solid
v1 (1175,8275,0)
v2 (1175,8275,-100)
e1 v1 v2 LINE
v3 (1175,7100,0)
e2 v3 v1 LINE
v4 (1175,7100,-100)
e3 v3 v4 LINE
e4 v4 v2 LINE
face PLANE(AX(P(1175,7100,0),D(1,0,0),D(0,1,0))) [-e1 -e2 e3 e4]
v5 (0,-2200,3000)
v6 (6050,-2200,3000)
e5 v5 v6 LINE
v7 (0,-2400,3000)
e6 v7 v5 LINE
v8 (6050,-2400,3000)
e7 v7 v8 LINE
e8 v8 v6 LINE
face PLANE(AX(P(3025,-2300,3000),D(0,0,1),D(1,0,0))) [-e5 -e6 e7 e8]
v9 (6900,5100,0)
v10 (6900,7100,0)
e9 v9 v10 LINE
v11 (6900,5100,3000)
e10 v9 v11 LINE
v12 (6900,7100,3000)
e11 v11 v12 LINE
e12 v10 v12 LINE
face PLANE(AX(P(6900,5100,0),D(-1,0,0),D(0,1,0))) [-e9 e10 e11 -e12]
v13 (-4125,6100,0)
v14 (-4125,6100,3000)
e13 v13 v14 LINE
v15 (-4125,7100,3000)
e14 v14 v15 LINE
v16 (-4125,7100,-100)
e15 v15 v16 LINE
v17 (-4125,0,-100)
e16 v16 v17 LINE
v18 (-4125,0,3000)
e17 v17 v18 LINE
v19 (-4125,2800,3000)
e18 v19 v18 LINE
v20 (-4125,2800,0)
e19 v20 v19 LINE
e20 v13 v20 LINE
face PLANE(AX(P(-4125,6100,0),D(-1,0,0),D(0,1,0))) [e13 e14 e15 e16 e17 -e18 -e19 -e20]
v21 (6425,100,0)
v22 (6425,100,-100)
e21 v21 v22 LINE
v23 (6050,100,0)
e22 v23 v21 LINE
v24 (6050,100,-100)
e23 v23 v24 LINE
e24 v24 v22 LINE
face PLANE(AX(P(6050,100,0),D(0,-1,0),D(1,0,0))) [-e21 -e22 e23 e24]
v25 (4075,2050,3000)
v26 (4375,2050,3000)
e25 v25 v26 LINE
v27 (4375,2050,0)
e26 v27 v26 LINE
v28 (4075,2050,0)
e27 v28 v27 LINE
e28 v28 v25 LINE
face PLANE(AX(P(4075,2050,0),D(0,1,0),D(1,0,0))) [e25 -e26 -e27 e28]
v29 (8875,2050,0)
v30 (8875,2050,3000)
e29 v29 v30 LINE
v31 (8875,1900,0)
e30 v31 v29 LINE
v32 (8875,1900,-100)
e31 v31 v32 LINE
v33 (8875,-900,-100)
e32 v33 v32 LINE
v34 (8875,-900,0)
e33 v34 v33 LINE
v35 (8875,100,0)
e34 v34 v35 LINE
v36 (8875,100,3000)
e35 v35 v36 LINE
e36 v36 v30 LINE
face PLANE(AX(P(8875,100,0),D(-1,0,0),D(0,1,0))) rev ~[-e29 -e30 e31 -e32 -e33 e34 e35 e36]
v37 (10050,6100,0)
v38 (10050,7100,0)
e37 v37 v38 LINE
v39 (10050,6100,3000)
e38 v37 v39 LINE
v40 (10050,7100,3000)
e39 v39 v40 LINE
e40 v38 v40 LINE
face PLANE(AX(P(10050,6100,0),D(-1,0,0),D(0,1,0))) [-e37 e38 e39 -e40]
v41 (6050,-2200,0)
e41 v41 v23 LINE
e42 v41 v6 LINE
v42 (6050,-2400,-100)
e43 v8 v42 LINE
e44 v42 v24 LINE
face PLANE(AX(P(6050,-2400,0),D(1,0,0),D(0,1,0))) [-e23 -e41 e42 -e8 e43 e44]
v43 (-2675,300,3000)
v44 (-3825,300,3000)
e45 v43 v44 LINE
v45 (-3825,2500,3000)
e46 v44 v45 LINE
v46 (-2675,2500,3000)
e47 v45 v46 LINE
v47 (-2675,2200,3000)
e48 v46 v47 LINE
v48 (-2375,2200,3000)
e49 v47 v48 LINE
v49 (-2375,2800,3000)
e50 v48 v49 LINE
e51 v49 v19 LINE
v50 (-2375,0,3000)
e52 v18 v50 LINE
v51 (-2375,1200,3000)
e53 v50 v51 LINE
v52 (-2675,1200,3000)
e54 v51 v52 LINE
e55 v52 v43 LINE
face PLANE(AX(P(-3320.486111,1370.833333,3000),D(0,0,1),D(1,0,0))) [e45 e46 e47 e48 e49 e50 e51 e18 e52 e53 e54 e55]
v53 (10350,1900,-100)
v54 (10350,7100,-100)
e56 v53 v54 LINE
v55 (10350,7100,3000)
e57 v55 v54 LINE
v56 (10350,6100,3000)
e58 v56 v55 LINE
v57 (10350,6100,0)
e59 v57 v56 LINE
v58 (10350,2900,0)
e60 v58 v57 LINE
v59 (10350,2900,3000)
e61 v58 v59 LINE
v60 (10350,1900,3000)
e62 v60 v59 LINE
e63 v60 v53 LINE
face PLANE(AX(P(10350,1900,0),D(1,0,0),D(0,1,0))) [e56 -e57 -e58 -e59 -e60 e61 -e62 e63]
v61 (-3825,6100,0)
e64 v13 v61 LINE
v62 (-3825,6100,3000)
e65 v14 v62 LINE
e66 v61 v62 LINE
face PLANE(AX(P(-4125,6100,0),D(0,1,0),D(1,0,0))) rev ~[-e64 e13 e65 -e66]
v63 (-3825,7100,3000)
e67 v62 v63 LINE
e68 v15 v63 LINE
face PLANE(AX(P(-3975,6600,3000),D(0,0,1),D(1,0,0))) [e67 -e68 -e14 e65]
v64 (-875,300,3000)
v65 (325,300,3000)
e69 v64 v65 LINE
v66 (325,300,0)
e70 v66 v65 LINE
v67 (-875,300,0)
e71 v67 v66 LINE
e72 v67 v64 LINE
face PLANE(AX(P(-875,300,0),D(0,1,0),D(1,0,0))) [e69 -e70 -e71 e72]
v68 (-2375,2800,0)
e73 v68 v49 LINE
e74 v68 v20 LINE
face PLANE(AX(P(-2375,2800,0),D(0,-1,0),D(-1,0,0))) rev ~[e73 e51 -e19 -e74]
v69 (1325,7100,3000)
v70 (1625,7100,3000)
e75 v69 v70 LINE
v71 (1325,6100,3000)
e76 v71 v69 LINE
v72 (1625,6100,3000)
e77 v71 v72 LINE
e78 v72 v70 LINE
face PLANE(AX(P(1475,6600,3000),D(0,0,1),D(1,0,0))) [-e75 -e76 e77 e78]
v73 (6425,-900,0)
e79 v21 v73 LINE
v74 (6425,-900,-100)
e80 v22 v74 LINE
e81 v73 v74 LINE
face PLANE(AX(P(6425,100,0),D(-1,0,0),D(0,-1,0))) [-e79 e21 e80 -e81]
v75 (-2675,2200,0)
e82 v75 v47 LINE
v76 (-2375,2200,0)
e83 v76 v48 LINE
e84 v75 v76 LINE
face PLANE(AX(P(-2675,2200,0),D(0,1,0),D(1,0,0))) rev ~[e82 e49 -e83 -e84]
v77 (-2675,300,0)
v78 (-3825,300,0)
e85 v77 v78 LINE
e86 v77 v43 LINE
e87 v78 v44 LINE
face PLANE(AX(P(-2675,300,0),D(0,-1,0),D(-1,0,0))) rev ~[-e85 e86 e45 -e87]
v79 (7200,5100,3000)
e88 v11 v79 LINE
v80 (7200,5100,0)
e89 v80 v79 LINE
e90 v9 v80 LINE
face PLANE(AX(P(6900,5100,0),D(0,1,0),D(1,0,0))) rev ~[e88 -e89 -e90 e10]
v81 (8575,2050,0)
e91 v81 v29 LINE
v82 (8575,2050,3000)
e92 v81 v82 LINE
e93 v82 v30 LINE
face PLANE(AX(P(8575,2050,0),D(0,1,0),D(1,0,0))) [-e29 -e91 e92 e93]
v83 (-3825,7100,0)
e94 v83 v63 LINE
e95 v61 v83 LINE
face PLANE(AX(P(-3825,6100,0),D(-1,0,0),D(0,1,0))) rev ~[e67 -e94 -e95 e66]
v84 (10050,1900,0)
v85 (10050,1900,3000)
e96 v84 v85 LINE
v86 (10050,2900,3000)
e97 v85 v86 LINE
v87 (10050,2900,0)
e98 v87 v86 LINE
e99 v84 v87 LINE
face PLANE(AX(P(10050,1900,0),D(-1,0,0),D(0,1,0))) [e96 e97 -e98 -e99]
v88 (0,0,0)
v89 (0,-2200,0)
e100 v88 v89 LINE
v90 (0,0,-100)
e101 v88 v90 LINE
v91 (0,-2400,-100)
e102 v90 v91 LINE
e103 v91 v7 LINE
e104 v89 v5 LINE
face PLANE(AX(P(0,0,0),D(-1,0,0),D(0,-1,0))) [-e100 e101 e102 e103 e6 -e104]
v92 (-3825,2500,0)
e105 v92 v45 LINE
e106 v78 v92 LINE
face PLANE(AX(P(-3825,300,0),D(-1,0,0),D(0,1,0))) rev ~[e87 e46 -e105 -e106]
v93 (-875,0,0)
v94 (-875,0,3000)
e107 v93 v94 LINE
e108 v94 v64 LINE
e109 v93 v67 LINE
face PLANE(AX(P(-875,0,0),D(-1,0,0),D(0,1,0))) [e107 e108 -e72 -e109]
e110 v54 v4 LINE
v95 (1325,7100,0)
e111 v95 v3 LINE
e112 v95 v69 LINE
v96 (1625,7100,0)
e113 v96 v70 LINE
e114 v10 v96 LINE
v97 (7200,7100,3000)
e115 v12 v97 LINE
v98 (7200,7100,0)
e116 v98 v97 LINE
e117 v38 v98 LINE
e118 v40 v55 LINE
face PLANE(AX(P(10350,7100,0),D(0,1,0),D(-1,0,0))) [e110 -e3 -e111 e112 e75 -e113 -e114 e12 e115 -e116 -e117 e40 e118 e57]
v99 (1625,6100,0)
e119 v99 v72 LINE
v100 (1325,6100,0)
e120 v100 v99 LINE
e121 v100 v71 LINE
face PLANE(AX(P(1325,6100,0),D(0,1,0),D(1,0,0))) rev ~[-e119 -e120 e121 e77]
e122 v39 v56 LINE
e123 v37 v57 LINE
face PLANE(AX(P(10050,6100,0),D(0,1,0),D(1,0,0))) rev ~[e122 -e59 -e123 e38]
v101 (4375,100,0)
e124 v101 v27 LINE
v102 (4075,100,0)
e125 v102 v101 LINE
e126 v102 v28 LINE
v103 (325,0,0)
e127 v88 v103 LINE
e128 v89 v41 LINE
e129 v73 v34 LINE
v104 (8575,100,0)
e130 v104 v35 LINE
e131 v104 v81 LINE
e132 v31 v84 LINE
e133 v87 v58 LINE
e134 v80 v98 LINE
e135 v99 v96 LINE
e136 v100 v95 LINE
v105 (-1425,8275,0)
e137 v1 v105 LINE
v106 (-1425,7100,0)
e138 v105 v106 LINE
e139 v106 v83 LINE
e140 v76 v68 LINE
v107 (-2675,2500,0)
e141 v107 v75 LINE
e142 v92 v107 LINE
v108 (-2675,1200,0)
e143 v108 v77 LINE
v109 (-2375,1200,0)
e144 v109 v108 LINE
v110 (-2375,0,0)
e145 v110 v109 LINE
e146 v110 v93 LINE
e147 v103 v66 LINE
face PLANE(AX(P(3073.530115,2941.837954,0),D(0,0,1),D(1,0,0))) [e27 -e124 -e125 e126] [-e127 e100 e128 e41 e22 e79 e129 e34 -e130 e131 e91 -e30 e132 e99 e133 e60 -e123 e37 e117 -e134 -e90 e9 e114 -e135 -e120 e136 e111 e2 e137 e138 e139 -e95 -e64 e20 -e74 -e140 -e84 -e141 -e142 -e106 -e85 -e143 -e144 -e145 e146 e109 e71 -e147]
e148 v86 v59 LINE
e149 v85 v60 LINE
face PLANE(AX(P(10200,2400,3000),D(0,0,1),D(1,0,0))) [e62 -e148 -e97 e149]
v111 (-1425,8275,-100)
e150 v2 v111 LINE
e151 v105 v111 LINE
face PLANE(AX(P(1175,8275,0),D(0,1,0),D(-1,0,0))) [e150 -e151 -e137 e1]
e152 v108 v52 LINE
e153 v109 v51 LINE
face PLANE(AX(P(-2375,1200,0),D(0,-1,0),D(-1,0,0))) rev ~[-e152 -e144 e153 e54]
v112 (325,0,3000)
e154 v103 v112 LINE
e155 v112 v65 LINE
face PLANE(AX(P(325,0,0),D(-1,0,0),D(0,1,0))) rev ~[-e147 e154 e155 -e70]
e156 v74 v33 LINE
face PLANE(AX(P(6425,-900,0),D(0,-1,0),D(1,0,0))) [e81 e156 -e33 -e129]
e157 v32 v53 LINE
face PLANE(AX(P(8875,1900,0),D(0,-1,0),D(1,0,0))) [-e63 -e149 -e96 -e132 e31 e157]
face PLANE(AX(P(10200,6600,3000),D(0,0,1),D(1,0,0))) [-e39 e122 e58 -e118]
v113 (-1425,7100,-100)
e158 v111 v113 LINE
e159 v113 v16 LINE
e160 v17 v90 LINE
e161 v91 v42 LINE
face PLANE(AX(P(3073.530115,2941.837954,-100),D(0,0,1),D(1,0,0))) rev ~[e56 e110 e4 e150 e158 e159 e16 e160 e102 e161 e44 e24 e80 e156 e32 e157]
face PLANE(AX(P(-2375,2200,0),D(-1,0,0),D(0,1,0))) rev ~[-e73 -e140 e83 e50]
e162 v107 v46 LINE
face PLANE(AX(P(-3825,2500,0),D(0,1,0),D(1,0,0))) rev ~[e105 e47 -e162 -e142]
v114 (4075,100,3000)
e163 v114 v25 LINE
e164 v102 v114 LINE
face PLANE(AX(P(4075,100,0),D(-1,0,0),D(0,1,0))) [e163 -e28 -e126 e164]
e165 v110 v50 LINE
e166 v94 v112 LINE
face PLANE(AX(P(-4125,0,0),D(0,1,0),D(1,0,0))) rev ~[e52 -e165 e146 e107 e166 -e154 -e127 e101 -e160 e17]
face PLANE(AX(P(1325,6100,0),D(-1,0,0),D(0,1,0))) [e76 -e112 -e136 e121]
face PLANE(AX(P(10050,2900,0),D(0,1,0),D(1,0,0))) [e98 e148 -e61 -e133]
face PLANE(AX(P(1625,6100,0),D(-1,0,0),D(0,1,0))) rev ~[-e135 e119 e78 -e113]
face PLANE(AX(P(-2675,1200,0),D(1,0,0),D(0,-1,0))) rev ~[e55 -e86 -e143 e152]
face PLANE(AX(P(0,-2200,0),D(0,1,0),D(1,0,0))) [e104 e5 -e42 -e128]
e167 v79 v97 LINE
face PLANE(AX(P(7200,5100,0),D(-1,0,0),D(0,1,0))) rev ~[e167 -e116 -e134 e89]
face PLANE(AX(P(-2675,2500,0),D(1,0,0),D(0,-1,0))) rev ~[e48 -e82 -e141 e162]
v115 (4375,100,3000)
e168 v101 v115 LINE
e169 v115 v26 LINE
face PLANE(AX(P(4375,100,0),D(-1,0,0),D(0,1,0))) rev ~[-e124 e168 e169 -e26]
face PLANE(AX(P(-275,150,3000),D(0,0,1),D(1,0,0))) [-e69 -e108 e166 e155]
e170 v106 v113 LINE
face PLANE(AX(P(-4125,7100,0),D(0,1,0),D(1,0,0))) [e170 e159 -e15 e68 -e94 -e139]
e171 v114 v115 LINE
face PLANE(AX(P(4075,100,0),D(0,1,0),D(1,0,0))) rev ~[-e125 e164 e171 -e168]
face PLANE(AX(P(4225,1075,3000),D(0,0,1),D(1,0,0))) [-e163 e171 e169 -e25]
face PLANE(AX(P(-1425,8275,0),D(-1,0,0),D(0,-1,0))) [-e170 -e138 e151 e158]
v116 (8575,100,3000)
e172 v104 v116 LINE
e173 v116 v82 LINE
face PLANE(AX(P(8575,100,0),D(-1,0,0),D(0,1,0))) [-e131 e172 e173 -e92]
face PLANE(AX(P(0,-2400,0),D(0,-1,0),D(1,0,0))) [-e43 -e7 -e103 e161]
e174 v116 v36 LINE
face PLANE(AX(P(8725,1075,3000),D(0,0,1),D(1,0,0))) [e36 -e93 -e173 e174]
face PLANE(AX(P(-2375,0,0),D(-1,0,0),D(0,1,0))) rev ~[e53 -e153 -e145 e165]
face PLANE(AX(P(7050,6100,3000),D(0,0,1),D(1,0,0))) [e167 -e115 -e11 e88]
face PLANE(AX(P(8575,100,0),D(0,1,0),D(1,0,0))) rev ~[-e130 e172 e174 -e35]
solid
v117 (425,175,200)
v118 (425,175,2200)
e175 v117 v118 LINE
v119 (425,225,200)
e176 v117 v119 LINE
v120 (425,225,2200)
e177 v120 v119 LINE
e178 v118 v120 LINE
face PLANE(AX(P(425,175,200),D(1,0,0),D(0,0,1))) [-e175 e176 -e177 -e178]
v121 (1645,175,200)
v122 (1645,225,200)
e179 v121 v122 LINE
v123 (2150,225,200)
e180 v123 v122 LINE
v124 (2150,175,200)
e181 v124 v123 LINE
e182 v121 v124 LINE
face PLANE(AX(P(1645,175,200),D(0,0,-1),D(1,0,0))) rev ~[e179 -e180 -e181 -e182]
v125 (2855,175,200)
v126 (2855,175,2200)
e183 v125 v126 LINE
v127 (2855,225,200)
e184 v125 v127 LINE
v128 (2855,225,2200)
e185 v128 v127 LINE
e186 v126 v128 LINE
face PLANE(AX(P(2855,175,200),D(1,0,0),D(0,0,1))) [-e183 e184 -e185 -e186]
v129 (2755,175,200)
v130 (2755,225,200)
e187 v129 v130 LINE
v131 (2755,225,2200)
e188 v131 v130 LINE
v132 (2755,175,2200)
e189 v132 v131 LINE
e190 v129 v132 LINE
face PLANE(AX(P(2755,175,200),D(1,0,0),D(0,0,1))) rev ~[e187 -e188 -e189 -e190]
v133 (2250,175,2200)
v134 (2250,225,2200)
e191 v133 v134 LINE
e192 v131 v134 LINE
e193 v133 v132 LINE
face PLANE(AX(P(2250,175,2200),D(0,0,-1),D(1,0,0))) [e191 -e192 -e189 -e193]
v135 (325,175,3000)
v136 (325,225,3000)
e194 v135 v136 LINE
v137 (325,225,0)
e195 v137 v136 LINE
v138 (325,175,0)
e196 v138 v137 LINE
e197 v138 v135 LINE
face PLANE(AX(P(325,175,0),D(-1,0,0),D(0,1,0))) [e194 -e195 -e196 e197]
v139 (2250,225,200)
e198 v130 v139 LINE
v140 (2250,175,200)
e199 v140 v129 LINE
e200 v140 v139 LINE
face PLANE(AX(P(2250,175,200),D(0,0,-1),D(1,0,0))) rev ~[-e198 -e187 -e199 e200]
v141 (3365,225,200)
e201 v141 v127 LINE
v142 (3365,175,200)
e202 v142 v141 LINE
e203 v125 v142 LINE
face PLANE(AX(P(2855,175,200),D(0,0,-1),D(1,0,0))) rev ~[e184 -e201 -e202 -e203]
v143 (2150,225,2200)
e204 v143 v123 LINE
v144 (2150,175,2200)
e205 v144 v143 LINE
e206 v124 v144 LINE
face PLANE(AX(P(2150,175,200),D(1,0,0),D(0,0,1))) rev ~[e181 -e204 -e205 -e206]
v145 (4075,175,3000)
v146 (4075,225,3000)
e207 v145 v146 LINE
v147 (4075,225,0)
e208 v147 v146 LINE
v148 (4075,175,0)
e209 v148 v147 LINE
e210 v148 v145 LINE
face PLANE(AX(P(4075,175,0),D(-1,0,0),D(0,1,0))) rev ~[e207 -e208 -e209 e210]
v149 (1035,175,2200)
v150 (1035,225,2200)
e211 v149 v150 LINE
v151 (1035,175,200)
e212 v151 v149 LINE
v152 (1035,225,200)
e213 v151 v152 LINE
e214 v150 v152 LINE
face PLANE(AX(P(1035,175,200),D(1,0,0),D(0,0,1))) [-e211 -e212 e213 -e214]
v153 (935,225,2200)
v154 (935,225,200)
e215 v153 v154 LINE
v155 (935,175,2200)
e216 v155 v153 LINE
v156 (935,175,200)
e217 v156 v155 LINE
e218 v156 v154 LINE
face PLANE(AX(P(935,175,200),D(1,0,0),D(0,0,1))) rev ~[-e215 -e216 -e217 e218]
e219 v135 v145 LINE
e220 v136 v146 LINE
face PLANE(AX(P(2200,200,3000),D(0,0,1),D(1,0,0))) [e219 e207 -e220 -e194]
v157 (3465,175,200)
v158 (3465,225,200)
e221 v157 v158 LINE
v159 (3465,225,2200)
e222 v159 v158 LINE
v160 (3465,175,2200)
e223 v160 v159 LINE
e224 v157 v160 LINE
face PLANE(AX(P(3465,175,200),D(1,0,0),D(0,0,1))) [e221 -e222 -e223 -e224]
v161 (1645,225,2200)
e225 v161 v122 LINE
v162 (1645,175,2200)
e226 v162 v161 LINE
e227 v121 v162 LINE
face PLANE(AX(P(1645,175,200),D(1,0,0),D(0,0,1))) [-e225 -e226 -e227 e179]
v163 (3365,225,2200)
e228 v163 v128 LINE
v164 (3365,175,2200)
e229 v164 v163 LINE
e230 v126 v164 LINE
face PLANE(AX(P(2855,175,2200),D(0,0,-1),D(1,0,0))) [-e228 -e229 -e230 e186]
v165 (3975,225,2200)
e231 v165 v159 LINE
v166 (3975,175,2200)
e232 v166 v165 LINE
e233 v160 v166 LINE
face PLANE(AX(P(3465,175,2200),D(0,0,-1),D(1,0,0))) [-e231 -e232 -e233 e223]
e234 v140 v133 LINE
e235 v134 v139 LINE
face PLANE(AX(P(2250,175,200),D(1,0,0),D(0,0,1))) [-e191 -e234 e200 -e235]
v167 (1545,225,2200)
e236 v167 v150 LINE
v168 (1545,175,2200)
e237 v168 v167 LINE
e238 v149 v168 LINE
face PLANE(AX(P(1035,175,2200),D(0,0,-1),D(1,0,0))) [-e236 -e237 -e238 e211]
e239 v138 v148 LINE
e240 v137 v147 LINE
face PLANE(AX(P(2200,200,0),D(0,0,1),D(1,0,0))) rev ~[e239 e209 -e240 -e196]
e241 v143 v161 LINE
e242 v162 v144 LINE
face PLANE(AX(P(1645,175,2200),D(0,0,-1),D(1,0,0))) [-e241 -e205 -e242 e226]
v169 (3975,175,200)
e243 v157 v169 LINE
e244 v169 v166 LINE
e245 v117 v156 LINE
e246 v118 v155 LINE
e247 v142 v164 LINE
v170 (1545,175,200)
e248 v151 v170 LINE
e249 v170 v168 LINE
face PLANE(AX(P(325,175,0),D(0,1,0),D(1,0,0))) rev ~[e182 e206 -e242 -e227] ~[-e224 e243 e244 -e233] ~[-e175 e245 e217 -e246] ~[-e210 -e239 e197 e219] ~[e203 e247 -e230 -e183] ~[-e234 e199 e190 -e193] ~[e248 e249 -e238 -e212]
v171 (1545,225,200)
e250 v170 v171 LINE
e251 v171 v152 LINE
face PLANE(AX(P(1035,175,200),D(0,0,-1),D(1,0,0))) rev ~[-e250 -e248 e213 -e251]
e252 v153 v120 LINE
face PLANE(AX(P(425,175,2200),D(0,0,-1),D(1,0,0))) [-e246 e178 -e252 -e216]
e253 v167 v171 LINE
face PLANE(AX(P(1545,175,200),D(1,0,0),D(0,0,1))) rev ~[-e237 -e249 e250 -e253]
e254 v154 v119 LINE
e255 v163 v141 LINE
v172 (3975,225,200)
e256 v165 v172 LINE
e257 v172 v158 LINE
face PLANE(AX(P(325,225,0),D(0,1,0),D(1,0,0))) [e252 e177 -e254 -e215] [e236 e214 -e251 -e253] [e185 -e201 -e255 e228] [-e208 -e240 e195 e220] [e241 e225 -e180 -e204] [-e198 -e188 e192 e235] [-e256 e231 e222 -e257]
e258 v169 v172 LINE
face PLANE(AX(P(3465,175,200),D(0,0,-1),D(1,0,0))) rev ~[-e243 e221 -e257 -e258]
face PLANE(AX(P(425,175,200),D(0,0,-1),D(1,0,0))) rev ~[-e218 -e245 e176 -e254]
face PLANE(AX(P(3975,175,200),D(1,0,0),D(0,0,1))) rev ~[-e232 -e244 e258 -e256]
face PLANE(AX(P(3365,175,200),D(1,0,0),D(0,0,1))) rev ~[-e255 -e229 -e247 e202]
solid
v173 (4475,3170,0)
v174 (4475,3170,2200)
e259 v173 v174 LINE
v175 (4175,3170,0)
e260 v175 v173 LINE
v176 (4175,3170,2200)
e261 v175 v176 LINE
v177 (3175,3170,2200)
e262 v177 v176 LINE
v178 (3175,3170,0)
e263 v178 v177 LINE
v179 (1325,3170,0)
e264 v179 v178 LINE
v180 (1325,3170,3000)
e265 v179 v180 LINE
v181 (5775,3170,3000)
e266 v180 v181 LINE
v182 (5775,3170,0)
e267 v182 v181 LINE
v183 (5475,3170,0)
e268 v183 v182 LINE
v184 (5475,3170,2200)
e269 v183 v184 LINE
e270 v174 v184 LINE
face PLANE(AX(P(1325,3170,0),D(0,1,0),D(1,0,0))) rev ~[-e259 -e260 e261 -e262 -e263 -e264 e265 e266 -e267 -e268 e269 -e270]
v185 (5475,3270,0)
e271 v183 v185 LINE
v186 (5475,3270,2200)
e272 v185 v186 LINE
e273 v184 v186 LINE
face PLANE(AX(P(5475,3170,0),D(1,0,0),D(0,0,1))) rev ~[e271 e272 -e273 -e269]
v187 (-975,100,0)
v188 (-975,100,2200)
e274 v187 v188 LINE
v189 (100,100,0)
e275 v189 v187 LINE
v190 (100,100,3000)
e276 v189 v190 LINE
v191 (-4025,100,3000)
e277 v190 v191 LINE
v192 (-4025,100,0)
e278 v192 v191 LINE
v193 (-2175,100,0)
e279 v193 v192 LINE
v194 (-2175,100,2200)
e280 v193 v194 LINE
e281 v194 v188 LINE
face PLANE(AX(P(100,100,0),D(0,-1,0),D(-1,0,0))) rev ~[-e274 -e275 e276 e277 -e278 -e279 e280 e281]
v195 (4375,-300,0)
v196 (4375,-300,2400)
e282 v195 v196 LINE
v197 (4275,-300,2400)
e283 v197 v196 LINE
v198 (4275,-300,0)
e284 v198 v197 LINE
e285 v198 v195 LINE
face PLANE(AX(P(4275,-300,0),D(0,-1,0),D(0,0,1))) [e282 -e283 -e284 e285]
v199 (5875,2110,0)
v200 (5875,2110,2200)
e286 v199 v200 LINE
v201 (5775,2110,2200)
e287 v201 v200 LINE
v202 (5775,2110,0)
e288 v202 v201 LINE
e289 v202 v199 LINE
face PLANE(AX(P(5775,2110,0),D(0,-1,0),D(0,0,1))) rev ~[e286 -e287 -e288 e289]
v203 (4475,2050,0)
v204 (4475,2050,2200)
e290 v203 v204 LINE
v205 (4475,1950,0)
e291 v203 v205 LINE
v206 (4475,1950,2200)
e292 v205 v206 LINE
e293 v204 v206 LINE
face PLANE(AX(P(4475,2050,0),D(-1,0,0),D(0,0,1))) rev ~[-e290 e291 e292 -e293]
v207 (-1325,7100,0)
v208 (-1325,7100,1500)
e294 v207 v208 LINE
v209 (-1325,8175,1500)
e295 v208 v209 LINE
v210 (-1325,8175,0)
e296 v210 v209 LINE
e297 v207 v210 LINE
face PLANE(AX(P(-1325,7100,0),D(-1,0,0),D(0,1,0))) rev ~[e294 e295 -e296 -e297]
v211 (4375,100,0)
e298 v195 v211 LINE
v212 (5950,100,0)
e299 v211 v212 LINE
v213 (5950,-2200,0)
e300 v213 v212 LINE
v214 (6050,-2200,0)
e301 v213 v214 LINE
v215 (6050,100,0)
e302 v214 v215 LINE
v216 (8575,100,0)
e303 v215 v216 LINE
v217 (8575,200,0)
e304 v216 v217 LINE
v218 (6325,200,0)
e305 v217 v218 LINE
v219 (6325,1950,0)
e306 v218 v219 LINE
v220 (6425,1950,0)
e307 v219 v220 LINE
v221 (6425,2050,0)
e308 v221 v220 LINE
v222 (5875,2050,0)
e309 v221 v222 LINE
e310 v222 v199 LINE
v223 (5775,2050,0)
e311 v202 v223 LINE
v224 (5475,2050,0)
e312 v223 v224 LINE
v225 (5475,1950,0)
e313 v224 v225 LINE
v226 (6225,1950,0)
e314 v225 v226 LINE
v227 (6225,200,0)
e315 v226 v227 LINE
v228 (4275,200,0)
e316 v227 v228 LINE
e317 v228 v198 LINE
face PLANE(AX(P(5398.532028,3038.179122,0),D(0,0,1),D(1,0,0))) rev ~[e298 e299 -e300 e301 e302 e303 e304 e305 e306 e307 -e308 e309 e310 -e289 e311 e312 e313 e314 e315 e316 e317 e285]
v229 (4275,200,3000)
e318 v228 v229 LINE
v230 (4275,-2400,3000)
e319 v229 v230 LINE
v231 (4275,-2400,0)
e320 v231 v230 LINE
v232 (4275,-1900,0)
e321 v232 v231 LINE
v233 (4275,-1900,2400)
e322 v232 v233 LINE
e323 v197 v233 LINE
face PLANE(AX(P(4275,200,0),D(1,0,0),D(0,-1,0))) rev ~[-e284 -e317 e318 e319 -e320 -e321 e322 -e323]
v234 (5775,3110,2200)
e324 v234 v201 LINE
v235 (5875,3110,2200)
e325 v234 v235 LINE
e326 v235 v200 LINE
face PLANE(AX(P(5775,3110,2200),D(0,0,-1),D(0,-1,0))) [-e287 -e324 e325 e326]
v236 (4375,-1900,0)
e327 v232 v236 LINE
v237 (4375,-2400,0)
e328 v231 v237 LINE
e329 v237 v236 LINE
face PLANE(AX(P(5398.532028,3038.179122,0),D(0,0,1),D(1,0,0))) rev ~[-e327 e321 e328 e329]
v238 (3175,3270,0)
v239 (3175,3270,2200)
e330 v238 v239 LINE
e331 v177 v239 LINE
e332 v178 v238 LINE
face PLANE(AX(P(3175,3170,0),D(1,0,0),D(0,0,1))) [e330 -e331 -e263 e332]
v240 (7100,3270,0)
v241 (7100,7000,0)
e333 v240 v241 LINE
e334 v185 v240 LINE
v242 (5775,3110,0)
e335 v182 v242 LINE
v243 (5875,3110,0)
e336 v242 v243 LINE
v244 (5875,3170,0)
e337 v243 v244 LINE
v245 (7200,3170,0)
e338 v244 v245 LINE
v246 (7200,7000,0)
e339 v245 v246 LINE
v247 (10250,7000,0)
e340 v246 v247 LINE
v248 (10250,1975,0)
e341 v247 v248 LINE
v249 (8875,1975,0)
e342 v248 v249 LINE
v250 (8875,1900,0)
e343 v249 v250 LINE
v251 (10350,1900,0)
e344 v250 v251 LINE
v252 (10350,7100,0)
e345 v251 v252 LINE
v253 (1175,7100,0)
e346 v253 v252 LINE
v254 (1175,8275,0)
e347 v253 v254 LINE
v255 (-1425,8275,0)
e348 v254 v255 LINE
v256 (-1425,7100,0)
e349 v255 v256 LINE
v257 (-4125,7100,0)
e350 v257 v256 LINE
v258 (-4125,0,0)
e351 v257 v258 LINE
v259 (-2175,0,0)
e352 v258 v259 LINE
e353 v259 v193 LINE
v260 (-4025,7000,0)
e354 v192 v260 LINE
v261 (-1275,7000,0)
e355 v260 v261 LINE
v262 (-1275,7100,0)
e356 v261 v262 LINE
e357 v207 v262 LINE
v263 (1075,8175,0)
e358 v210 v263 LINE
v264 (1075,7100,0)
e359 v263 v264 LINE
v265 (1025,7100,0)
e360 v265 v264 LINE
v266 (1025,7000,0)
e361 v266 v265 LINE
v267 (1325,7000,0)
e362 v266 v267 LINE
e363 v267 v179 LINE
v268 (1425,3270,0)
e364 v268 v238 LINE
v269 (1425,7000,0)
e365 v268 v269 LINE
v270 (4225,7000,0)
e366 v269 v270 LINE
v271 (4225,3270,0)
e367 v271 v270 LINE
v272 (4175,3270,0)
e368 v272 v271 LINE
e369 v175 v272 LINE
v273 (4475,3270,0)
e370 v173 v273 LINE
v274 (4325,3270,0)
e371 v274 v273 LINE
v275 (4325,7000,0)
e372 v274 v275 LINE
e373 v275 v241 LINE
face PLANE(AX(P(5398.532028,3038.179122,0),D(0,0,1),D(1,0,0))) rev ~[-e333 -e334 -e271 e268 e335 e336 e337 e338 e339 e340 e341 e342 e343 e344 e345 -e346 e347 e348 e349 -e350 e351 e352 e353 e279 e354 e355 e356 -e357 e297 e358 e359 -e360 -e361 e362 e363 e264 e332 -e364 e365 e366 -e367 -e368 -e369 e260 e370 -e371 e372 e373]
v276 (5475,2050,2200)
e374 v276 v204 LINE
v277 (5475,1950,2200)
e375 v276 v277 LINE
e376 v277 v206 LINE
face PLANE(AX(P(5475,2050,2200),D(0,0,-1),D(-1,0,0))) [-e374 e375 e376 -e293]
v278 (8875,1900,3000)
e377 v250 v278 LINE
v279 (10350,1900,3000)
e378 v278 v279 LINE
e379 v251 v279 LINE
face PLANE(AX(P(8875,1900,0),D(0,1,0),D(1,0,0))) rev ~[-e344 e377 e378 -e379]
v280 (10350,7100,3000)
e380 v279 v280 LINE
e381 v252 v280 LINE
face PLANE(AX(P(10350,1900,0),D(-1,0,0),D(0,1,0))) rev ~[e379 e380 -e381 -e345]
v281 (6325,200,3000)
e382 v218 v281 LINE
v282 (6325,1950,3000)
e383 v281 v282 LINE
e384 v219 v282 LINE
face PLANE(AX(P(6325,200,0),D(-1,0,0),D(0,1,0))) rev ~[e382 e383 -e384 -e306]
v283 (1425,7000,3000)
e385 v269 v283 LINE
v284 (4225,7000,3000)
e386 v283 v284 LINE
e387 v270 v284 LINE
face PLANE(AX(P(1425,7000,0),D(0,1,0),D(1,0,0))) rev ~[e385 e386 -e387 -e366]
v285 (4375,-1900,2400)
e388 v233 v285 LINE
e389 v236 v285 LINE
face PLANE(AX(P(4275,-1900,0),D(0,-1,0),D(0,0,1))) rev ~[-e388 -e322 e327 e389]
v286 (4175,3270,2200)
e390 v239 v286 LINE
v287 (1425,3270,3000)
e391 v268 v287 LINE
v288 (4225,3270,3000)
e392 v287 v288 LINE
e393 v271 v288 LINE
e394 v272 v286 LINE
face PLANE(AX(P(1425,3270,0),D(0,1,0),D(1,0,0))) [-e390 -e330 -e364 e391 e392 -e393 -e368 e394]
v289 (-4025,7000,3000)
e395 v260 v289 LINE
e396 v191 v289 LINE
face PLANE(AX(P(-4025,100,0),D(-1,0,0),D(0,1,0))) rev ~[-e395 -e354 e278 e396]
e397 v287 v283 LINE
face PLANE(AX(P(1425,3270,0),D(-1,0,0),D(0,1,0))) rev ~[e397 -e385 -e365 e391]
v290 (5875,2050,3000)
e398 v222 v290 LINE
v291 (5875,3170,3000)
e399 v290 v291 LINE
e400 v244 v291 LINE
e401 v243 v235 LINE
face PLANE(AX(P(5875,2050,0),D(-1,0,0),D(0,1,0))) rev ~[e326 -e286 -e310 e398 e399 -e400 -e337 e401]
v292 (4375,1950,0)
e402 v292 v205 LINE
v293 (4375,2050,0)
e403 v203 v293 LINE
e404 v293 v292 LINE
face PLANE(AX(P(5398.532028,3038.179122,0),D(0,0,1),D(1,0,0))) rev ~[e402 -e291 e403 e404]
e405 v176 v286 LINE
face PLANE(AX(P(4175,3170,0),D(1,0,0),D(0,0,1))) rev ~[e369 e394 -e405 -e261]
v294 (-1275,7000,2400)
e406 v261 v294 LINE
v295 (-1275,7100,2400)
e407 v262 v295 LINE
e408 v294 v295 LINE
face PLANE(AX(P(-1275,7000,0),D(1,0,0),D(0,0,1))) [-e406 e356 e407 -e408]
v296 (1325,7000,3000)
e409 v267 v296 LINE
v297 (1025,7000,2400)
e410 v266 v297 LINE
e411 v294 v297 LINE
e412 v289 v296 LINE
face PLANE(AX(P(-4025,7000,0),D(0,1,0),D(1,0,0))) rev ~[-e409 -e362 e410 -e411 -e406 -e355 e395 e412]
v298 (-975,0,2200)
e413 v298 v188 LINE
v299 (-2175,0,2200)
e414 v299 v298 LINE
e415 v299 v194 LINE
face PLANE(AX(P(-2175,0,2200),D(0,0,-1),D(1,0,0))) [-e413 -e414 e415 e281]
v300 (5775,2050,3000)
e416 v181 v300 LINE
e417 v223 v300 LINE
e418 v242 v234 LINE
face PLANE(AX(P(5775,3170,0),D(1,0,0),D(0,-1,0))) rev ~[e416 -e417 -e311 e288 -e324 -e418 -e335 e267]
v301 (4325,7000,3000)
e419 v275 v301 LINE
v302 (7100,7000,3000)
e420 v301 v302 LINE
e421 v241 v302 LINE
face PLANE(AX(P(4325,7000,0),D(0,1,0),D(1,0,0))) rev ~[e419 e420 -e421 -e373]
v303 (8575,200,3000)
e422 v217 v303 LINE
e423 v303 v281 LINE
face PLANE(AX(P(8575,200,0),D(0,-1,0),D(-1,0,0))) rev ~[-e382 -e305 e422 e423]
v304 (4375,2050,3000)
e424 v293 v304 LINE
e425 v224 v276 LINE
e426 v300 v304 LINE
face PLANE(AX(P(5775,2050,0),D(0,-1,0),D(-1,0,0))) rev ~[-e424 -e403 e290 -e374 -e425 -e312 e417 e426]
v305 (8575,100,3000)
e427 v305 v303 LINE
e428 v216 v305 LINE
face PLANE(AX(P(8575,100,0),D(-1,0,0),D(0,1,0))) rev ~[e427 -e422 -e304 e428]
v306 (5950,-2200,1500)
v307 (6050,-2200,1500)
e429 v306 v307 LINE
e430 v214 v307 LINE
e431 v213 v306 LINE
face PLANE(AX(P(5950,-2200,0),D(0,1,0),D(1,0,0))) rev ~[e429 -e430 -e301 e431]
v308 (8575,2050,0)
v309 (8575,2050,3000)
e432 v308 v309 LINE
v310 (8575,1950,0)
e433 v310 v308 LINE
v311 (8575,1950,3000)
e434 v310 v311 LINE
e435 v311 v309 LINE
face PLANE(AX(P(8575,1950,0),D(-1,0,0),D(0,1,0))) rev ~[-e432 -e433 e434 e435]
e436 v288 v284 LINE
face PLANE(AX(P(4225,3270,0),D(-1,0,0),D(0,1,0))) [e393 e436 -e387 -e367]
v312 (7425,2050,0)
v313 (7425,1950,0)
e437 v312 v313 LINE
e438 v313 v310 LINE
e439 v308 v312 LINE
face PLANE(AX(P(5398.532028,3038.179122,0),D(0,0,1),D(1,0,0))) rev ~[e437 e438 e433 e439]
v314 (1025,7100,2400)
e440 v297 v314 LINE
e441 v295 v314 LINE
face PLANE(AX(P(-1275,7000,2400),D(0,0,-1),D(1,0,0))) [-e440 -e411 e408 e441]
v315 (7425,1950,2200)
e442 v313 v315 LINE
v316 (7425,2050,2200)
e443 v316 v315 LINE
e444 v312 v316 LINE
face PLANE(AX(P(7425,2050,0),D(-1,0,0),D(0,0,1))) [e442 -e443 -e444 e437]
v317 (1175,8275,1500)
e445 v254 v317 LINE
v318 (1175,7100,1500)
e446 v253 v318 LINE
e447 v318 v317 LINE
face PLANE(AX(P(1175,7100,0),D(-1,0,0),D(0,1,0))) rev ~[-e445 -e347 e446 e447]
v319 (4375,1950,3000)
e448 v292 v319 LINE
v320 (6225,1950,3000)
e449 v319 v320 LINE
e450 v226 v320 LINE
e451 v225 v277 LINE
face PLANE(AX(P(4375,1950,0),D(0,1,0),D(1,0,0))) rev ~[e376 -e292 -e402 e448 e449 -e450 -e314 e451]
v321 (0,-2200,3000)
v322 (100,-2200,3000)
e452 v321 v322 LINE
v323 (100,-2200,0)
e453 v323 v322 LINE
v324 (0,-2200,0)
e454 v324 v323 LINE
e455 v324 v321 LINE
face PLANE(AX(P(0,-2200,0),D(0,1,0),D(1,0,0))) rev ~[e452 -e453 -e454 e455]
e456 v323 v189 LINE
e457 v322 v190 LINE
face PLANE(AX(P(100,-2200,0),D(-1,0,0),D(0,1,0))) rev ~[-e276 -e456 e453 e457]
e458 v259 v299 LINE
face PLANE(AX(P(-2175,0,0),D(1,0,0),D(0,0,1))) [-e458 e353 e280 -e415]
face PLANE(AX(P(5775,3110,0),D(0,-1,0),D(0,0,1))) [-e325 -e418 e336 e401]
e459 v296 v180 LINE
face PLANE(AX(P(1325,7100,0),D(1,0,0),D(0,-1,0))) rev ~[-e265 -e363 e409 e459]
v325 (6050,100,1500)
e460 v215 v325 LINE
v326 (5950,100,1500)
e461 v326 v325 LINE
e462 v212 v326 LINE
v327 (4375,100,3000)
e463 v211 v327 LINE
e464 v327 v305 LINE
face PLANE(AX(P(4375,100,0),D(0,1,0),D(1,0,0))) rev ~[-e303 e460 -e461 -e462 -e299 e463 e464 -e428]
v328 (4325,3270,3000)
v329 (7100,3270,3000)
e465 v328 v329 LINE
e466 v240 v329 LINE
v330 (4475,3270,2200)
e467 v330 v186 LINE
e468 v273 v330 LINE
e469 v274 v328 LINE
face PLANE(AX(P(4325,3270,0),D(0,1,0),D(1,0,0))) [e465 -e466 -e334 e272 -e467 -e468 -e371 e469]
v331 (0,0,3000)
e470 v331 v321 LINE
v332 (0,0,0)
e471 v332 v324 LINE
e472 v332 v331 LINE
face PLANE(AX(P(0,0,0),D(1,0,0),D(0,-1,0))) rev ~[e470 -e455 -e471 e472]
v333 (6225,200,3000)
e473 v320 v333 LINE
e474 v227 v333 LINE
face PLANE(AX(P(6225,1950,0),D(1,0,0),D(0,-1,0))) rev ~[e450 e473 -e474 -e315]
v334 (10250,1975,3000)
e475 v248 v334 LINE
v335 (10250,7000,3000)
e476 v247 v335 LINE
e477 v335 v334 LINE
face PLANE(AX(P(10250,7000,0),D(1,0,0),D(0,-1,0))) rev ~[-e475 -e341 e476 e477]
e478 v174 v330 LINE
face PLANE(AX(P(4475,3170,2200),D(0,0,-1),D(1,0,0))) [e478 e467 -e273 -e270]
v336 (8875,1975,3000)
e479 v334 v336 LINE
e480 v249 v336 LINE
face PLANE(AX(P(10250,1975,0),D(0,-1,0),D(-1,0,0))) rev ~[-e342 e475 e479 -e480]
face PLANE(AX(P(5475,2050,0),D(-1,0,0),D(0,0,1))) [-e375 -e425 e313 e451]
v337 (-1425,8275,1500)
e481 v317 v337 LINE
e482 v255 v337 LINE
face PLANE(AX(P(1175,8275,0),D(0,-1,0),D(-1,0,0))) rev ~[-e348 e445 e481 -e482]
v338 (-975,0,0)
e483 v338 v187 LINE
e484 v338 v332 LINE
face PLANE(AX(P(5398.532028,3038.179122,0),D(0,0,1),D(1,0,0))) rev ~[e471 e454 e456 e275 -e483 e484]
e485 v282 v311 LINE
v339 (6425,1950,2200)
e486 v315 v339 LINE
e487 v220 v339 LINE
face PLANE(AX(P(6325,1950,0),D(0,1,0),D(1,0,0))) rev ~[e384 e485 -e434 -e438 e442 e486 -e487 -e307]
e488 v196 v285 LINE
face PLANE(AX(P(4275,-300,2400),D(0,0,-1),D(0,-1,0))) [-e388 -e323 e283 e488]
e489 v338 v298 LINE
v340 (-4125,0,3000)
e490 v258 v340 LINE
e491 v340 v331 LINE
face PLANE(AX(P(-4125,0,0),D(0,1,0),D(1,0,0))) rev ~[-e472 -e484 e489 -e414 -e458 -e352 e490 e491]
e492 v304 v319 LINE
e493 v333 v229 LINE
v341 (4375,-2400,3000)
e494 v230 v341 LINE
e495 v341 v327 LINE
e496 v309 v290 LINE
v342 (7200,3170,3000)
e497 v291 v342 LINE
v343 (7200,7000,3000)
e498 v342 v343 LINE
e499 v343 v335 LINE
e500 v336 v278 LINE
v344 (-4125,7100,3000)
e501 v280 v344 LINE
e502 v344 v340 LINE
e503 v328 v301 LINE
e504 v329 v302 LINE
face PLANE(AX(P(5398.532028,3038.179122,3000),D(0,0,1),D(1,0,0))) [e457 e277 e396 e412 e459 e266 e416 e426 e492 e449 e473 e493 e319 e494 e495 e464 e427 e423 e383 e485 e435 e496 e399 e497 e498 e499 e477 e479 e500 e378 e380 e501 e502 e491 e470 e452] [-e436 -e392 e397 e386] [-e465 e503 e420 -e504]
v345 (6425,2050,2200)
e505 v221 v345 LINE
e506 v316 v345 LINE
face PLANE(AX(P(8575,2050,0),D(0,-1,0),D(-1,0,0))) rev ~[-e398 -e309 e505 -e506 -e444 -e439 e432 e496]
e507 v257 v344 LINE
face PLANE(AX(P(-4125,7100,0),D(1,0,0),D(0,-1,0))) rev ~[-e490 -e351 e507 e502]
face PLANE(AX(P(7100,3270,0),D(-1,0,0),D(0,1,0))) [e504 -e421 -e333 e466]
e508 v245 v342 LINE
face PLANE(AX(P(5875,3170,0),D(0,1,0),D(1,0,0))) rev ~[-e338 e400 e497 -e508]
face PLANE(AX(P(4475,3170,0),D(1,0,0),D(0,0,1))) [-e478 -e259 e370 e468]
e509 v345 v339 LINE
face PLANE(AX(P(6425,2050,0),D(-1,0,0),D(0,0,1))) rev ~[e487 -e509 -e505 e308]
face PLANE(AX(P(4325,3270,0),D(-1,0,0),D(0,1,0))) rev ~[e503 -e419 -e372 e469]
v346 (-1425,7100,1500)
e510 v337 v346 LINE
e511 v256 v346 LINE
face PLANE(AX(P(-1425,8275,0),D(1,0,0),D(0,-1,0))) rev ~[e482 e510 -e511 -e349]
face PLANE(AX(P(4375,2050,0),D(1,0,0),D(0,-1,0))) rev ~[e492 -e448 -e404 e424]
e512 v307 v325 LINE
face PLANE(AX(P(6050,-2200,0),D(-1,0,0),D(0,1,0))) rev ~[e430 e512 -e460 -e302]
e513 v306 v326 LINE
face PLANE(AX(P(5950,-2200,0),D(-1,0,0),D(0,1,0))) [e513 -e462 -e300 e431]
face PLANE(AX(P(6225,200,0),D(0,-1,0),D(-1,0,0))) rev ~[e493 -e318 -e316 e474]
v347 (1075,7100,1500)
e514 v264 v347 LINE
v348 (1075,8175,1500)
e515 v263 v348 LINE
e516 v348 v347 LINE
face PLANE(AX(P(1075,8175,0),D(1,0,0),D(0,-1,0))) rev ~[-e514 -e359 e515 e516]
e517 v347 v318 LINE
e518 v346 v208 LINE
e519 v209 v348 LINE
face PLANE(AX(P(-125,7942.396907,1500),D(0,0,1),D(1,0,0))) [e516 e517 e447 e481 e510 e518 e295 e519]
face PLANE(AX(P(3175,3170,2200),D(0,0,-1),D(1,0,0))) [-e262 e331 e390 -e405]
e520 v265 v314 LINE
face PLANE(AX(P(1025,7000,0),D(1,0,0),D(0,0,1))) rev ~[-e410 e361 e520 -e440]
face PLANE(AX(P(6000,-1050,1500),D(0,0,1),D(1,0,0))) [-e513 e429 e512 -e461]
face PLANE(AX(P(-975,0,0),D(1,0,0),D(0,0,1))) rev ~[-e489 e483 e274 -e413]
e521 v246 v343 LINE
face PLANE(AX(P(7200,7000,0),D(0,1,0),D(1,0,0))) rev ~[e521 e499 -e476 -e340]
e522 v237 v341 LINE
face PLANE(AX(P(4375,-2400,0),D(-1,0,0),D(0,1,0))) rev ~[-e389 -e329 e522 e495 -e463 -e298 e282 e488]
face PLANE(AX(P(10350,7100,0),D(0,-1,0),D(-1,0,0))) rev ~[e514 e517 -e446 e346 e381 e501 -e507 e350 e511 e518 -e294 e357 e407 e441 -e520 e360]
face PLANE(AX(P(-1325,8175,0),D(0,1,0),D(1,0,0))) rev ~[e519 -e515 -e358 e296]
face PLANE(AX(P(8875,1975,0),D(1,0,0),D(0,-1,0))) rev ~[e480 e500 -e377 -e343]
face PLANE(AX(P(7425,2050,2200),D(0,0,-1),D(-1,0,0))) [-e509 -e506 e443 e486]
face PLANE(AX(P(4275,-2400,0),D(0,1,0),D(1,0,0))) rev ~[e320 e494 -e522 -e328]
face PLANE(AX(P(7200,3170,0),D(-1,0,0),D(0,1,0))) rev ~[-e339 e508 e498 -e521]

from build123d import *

# Parameters (mm, degrees)
F1_DEPTH  = 100
F3_DEPTH  = 3000
F4_W      = 300
F4_H      = 1000
F4_H_2    = 2000
F4_H_3    = 1950
F4_W_2    = 1200
F4_H_4    = 300
F4_W_3    = 6050
F4_H_5    = 200
F5_DEPTH  = 3000
F6_W      = 2750
F6_H      = 100
F7_DEPTH  = 3000
F8_W      = 2800
F8_H      = 3730
F8_W_2    = 2775
F9_DEPTH  = 3000
F10_W     = 1200
F10_H     = 2200
F11_DEPTH = 100
F12_W     = 1000
F12_H     = 2200
F13_DEPTH = 100
F14_W     = 1000
F14_H     = 2200
F15_DEPTH = 100
F16_W     = 1000
F16_H     = 2200
F17_DEPTH = 100
F18_W     = 1600
F18_H     = 2400
F19_DEPTH = 100
F20_W     = 2300
F20_H     = 2400
F21_DEPTH = 100
F22_W     = 100
F22_H     = 2300
F23_DEPTH = 1500
F24_W     = 3750
F24_H     = 50
F25_DEPTH = 3000
F26_W     = 510
F26_H     = 2000
F26_W_2   = 505
F27_DEPTH = 8100.001


with BuildPart() as f1:
    # F0 (on Top) → F1 (new body)
    with BuildSketch(Plane.XY):
        Polygon((-4125, 0), (0, 0), (0, -2400), (6050, -2400), (6050, -900), (6050, 0), (6050, 100), (6425, 100), (6425, 0), (6425, -900), (8875, -900), (8875, 1900), (10350, 1900), (10350, 7100), (1175, 7100), (1175, 8275), (-1425, 8275), (-1425, 7100), (-4125, 7100), align=None)
    extrude(amount=-F1_DEPTH)

    # F2 (on face) → F3 (join)
    with BuildSketch(Plane.XY):
        Polygon((-4125, 2800), (-4125, 0), (-2375, 0), (-2375, 1200), (-2675, 1200), (-2675, 300), (-3825, 300), (-3825, 2500), (-2675, 2500), (-2675, 2200), (-2375, 2200), (-2375, 2800), align=None)
    extrude(amount=F3_DEPTH)

    # F4 (on face) → F5 (join)
    with BuildSketch(Plane.XY):
        with Locations((-3975, 6600)):
            Rectangle(F4_W, F4_H)
        with Locations((1475, 6600)):
            Rectangle(F4_W, F4_H)
        with Locations((7050, 6100)):
            Rectangle(F4_W, F4_H_2)
        with Locations((10200, 6600)):
            Rectangle(F4_W, F4_H)
        with Locations((10200, 2400)):
            Rectangle(F4_W, F4_H)
        with Locations((8725, 1075)):
            Rectangle(F4_W, F4_H_3)
        with Locations((4225, 1075)):
            Rectangle(F4_W, F4_H_3)
        with Locations((-275, 150)):
            Rectangle(F4_W_2, F4_H_4)
        with Locations((3025, -2300)):
            Rectangle(F4_W_3, F4_H_5)
    extrude(amount=F5_DEPTH)


with BuildPart() as f7:
    # F6 (on face) → F7 (new body)
    with BuildSketch(Plane.XY):
        Polygon((0, 0), (0, -2200), (100, -2200), (100, 100), (-4025, 100), (-4025, 7000), (-1425, 7000), (-1425, 7100), (-4125, 7100), (-4125, 0), align=None)
        with Locations((-50, 7050)):
            Rectangle(F6_W, F6_H)
    extrude(amount=F7_DEPTH)

    # F8 (on face) → F9 (join)
    with BuildSketch(Plane.XY):
        Polygon((5875, 3170), (7200, 3170), (7200, 7000), (7200, 7100), (1325, 7100), (1325, 3170), (5775, 3170), (5775, 2050), (4375, 2050), (4375, 1950), (6225, 1950), (6225, 200), (4375, 200), (4375, 100), (8575, 100), (8575, 200), (6325, 200), (6325, 1950), (8575, 1950), (8575, 2050), (5875, 2050), align=None)
        with Locations((2825, 5135)):
            Rectangle(F8_W, F8_H, mode=Mode.SUBTRACT)
        with Locations((5712.5, 5135)):
            Rectangle(F8_W_2, F8_H, mode=Mode.SUBTRACT)
        Polygon((7200, 7100), (7200, 7000), (10250, 7000), (10250, 1975), (8875, 1975), (8875, 1900), (10250, 1900), (10350, 1900), (10350, 7000), (10350, 7100), (10250, 7100), align=None)
        Polygon((4375, -2400), (4375, 100), (4375, 200), (4275, 200), (4275, -2400), align=None)
    extrude(amount=F9_DEPTH)

    # F10 (on face) → F11 (cut)
    with BuildSketch(Plane.XZ):
        with Locations((-1575, 1100)):
            Rectangle(F10_W, F10_H)
    extrude(amount=-F11_DEPTH, mode=Mode.SUBTRACT)

    # F12 (on face) → F13 (cut)
    with BuildSketch(Plane.XZ.offset(-3170)):
        with Locations((3675, 1100)):
            Rectangle(F12_W, F12_H)
        with Locations((4975, 1100)):
            Rectangle(F12_W, F12_H)
    extrude(amount=-F13_DEPTH, mode=Mode.SUBTRACT)

    # F14 (on face) → F15 (cut)
    with BuildSketch(Plane(origin=(5775, 0, 0), x_dir=(0, -1, 0), z_dir=(-1, 0, 0))):
        with Locations((-2610, 1100)):
            Rectangle(F14_W, F14_H)
    extrude(amount=-F15_DEPTH, mode=Mode.SUBTRACT)

    # F16 (on face) → F17 (cut)
    with BuildSketch(Plane(origin=(0, 2050, 0), x_dir=(-1, 0, 0), z_dir=(0, 1, 0))):
        with Locations((-4975, 1100)):
            Rectangle(F16_W, F16_H)
        with Locations((-6925, 1100)):
            Rectangle(F16_W, F16_H)
    extrude(amount=-F17_DEPTH, mode=Mode.SUBTRACT)

    # F18 (on face) → F19 (cut)
    with BuildSketch(Plane(origin=(4275, 0, 0), x_dir=(0, -1, 0), z_dir=(-1, 0, 0))):
        with Locations((1100, 1200)):
            Rectangle(F18_W, F18_H)
    extrude(amount=-F19_DEPTH, mode=Mode.SUBTRACT)

    # F20 (on face) → F21 (cut)
    with BuildSketch(Plane.XZ.offset(-7000)):
        with Locations((-125, 1200)):
            Rectangle(F20_W, F20_H)
    extrude(amount=-F21_DEPTH, mode=Mode.SUBTRACT)

    # F22 (on face) → F23 (join)
    with BuildSketch(Plane.XY):
        Polygon((-1425, 8275), (-1425, 7100), (-1325, 7100), (-1325, 8175), (1075, 8175), (1075, 7100), (1175, 7100), (1175, 8275), align=None)
        with Locations((6000, -1050)):
            Rectangle(F22_W, F22_H)
    extrude(amount=F23_DEPTH)


with BuildPart() as f25:
    # F24 (on face) → F25 (new body)
    with BuildSketch(Plane.XY):
        with Locations((2200, 200)):
            Rectangle(F24_W, F24_H)
    extrude(amount=F25_DEPTH)

    # F26 (on face) → F27 (cut, through all)
    with BuildSketch(Plane.XZ.offset(-175)):
        with Locations((680, 1200)):
            Rectangle(F26_W, F26_H)
        with Locations((1290, 1200)):
            Rectangle(F26_W, F26_H)
        with Locations((1897.5, 1200)):
            Rectangle(F26_W_2, F26_H)
        with Locations((3720, 1200)):
            Rectangle(F26_W, F26_H)
        with Locations((2502.5, 1200)):
            Rectangle(F26_W_2, F26_H)
        with Locations((3110, 1200)):
            Rectangle(F26_W, F26_H)
    extrude(amount=-F27_DEPTH, mode=Mode.SUBTRACT)


solid = Compound([f1.part, f7.part, f25.part])
